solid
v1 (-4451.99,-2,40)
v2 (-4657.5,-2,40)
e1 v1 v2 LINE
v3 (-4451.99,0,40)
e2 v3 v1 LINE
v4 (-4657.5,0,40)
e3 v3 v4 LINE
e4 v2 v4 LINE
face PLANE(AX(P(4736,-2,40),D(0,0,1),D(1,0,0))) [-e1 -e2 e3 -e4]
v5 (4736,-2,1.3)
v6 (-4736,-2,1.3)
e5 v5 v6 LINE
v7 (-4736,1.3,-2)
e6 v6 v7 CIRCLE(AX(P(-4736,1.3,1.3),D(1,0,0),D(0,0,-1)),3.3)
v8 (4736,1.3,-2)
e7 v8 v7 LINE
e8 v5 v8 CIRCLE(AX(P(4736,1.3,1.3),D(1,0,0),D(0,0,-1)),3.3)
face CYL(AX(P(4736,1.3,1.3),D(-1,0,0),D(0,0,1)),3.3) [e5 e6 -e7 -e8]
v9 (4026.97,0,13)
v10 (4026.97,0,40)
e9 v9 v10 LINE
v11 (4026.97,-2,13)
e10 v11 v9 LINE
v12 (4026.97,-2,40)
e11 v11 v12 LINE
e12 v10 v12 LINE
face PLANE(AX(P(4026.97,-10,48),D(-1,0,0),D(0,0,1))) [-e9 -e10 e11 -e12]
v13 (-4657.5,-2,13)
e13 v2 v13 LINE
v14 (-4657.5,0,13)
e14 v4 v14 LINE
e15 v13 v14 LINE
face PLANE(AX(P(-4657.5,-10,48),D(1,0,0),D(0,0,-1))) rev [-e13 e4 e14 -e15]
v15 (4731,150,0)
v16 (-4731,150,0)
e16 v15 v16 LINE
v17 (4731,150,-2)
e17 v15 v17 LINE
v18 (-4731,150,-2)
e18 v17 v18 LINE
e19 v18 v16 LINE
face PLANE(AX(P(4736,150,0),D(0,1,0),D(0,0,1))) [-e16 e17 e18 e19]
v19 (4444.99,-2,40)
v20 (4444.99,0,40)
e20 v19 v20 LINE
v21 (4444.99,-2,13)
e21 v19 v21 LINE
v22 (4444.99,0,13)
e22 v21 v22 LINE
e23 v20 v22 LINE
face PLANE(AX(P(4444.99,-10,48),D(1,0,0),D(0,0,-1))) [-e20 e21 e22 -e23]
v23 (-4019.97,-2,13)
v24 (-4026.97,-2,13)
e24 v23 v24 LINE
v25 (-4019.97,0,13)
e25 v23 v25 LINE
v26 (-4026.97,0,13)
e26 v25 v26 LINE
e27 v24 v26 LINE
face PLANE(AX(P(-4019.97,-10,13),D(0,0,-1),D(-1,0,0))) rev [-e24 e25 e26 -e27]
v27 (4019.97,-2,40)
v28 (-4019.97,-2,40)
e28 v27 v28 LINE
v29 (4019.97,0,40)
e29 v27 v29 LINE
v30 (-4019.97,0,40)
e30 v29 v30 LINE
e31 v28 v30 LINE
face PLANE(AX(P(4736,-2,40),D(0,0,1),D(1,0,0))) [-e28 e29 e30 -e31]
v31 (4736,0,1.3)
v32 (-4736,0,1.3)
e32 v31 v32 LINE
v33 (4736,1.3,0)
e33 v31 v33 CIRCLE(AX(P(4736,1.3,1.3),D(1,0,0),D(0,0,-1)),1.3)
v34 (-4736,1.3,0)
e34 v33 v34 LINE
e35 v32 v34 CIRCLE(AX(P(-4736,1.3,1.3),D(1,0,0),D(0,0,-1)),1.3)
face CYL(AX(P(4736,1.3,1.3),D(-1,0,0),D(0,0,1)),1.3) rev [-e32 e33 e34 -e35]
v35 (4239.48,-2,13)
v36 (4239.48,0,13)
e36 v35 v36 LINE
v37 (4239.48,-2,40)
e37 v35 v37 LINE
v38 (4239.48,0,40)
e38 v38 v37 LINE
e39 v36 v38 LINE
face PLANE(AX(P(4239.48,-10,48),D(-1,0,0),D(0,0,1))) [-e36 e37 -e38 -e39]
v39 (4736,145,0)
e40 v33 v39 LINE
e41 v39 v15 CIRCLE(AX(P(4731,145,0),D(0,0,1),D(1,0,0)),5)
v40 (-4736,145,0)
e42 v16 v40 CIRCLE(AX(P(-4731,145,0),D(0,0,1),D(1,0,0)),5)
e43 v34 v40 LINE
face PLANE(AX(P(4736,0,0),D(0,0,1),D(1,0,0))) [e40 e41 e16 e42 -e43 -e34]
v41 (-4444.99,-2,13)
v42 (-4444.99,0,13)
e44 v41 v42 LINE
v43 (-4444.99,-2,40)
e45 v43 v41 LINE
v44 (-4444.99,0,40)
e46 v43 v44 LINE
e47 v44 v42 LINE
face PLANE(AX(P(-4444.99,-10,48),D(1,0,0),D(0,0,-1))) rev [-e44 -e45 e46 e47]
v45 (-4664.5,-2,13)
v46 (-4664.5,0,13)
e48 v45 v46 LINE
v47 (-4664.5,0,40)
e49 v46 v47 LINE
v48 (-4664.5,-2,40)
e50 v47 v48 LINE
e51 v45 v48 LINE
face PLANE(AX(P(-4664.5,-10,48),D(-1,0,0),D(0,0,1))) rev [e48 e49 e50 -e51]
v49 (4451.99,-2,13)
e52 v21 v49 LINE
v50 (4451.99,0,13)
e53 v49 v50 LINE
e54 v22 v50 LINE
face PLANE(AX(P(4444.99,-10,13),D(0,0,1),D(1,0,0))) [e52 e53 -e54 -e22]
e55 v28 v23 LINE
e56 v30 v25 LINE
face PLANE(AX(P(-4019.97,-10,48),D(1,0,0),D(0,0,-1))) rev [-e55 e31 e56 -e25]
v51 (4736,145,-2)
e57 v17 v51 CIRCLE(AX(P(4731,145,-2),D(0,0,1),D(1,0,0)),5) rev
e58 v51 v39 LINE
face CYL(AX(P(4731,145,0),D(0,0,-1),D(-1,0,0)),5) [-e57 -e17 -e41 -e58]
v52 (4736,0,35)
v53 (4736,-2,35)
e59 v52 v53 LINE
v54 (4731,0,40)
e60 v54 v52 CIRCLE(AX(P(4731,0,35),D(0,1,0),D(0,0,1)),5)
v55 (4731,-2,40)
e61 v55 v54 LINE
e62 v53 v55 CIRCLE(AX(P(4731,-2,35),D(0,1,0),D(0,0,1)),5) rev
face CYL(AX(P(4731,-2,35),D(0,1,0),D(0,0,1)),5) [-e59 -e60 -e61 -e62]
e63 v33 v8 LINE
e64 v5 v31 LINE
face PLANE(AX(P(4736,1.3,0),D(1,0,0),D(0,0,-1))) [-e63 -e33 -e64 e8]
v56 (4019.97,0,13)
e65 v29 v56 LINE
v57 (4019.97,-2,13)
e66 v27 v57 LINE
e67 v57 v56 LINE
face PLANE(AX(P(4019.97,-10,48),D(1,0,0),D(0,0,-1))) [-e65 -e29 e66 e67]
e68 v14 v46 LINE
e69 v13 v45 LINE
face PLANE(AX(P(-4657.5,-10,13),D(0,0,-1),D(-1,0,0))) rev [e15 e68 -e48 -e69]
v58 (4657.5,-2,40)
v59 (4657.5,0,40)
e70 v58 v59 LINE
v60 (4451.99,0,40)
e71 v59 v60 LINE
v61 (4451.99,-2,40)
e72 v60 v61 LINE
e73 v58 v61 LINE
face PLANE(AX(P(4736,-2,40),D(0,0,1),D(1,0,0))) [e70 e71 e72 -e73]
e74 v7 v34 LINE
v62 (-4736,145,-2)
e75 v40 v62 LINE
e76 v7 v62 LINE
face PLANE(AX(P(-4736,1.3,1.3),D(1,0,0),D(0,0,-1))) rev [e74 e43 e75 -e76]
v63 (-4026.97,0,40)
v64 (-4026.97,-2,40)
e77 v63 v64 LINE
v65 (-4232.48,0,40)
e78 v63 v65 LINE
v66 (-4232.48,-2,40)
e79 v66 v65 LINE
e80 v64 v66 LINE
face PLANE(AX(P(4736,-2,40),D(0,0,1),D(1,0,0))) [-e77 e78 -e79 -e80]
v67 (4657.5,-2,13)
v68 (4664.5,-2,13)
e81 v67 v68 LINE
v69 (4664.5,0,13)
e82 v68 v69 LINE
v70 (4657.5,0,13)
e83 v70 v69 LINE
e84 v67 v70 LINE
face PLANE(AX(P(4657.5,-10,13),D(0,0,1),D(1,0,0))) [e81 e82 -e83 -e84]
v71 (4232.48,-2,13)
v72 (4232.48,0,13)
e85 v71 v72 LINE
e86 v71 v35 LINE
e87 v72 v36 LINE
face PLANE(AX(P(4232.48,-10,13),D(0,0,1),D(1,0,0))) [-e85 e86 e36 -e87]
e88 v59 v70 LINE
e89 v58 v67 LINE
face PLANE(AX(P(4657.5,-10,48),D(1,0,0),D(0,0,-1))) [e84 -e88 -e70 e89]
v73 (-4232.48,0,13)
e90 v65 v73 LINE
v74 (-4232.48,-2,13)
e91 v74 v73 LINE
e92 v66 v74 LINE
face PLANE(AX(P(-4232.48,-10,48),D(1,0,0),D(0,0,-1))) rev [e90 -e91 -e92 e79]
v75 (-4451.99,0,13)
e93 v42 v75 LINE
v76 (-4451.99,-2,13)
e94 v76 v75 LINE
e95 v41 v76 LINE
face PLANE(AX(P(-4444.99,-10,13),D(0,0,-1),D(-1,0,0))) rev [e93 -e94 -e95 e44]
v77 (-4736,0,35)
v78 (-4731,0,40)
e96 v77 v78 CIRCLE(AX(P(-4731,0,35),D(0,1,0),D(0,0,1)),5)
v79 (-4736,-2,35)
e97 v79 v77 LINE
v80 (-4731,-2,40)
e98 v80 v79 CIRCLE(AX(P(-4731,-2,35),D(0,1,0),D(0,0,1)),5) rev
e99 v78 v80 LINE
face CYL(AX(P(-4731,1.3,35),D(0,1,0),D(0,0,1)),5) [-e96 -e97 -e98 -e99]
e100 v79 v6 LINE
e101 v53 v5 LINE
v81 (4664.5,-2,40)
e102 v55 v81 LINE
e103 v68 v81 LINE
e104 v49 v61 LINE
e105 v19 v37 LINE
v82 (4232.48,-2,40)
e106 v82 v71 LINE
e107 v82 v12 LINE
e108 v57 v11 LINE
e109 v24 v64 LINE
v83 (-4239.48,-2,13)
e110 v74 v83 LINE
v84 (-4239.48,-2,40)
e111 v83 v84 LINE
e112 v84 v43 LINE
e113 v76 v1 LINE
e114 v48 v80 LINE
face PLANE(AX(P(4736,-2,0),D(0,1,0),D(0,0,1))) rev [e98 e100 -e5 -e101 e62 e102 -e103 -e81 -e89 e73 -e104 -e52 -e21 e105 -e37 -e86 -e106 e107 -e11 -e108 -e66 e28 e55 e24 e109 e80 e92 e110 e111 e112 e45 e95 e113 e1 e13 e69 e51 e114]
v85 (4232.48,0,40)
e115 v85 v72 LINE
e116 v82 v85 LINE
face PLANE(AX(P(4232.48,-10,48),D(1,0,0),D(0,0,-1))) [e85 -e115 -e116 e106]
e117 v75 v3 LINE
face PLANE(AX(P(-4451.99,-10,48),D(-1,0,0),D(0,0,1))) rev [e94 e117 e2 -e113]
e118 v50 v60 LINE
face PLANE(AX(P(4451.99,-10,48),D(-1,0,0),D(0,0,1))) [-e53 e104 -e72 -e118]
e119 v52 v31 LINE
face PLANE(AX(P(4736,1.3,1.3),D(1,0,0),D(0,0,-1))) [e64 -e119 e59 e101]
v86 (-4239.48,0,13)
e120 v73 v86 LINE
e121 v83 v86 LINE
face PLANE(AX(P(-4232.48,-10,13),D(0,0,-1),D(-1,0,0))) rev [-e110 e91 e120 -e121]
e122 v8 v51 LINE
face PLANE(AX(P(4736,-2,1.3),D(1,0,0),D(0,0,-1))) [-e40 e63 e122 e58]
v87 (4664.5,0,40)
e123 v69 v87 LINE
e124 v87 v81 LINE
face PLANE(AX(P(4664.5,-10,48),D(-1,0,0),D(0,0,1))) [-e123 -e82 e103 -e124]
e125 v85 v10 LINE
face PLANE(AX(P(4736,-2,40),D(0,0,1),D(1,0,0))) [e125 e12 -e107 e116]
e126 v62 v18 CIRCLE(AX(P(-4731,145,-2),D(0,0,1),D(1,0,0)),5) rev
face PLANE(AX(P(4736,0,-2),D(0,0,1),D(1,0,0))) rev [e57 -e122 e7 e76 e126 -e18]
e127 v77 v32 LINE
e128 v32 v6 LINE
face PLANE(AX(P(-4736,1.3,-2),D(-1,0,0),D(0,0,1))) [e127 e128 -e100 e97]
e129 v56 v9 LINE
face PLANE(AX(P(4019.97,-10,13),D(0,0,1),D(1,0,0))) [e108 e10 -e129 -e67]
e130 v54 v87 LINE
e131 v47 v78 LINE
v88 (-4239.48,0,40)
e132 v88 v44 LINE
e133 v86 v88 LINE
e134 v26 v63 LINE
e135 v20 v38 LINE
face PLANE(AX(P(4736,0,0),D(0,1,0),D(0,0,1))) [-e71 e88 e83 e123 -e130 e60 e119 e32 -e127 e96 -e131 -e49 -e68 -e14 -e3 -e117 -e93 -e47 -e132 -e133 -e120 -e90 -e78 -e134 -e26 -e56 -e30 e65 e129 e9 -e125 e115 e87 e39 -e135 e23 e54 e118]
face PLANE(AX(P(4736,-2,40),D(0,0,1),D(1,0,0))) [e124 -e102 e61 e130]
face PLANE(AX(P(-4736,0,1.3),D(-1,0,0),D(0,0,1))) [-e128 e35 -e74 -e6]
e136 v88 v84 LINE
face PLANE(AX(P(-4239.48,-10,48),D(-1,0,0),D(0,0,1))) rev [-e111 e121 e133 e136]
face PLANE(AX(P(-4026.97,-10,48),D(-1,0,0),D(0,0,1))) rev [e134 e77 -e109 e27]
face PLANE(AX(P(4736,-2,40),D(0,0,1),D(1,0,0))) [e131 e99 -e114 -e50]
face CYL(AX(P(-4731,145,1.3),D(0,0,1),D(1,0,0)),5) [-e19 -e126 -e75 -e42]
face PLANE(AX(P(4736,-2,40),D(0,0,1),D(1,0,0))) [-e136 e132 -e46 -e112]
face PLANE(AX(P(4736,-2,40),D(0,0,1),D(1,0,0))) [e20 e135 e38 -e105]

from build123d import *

# Parameters (mm, degrees)
BASE_FLANGE1_DEPTH       = 4736
FILLET1_R                = 5
SKETCH2_W                = 7
SKETCH2_H                = 35
CUT_EXTRUDE1_DEPTH       = 10
PATTERN_LINEAR_1_COUNT   = 4
PATTERN_LINEAR_1_PITCH   = 212.51
MIRROR_1_COPY_1_SKETCH_W = 7
MIRROR_1_COPY_1_SKETCH_H = 35
MIRROR_1_COPY_1_DEPTH    = 10
MIRROR_1_COPY_2_SKETCH_W = 7
MIRROR_1_COPY_2_SKETCH_H = 35
MIRROR_1_COPY_2_DEPTH    = 10
MIRROR_1_COPY_3_SKETCH_W = 7
MIRROR_1_COPY_3_SKETCH_H = 35
MIRROR_1_COPY_3_DEPTH    = 10


# Sheet-metal steps are written as plain solids
with BuildPart() as part:
    # Sketch1 → Base-Flange1 (new, symmetric)
    with BuildSketch(Plane(origin=(0, 0, 0), x_dir=(0, 0, -1), z_dir=(1, 0, 0))):
        with BuildLine():
            Line((-40, 0), (-1.3, 0))
            ThreePointArc((-1.3, 0), (-0.380761184, 0.380761184), (0, 1.3))
            Line((0, 1.3), (0, 150))
            Line((0, 150), (2, 150))
            Line((2, 150), (2, 1.3))
            ThreePointArc((2, 1.3), (1.033452378, -1.033452378), (-1.3, -2))
            Line((-1.3, -2), (-40, -2))
            Line((-40, -2), (-40, 0))
        make_face()
    extrude(amount=BASE_FLANGE1_DEPTH, both=True)

    # Fillet1
    fillet1_edges = [part.edges().sort_by_distance(p)[0] for p in [
        (4736, -1, 40),
        (-4736, -1, 40),
        (4736, 150, -1),
        (-4736, 150, -1),
    ]]
    fillet(fillet1_edges, radius=FILLET1_R)

    # Sketch2 → Cut-Extrude1 (cut)
    with BuildSketch(Plane(origin=(0, 0, 0), x_dir=(1, 0, 0), z_dir=(0, 1, 0))):
        with Locations((-4661, -30.5)):
            Rectangle(SKETCH2_W, SKETCH2_H)
    cut_extrude1 = extrude(amount=-CUT_EXTRUDE1_DEPTH, mode=Mode.SUBTRACT)

    # 阵列(线性)1: Cut-Extrude1 ×4
    with Locations(*[(i * PATTERN_LINEAR_1_PITCH, 0, 0) for i in range(1, PATTERN_LINEAR_1_COUNT)]):
        add(cut_extrude1, mode=Mode.SUBTRACT)

    # 镜向1: Cut-Extrude1 across plane
    add(cut_extrude1.mirror(Plane.ZY), mode=Mode.SUBTRACT)

    # 镜向1 copy 1 sketch → 镜向1 copy 1 (cut)
    with BuildSketch(Plane(origin=(-212.51, 0, 0), x_dir=(-1, 0, 0), z_dir=(0, 1, 0))):
        with Locations((-4661, 30.5)):
            Rectangle(MIRROR_1_COPY_1_SKETCH_W, MIRROR_1_COPY_1_SKETCH_H)
    extrude(amount=-MIRROR_1_COPY_1_DEPTH, mode=Mode.SUBTRACT)

    # 镜向1 copy 2 sketch → 镜向1 copy 2 (cut)
    with BuildSketch(Plane(origin=(-425.02, 0, 0), x_dir=(-1, 0, 0), z_dir=(0, 1, 0))):
        with Locations((-4661, 30.5)):
            Rectangle(MIRROR_1_COPY_2_SKETCH_W, MIRROR_1_COPY_2_SKETCH_H)
    extrude(amount=-MIRROR_1_COPY_2_DEPTH, mode=Mode.SUBTRACT)

    # 镜向1 copy 3 sketch → 镜向1 copy 3 (cut)
    with BuildSketch(Plane(origin=(-637.53, 0, 0), x_dir=(-1, 0, 0), z_dir=(0, 1, 0))):
        with Locations((-4661, 30.5)):
            Rectangle(MIRROR_1_COPY_3_SKETCH_W, MIRROR_1_COPY_3_SKETCH_H)
    extrude(amount=-MIRROR_1_COPY_3_DEPTH, mode=Mode.SUBTRACT)


solid = part.part
